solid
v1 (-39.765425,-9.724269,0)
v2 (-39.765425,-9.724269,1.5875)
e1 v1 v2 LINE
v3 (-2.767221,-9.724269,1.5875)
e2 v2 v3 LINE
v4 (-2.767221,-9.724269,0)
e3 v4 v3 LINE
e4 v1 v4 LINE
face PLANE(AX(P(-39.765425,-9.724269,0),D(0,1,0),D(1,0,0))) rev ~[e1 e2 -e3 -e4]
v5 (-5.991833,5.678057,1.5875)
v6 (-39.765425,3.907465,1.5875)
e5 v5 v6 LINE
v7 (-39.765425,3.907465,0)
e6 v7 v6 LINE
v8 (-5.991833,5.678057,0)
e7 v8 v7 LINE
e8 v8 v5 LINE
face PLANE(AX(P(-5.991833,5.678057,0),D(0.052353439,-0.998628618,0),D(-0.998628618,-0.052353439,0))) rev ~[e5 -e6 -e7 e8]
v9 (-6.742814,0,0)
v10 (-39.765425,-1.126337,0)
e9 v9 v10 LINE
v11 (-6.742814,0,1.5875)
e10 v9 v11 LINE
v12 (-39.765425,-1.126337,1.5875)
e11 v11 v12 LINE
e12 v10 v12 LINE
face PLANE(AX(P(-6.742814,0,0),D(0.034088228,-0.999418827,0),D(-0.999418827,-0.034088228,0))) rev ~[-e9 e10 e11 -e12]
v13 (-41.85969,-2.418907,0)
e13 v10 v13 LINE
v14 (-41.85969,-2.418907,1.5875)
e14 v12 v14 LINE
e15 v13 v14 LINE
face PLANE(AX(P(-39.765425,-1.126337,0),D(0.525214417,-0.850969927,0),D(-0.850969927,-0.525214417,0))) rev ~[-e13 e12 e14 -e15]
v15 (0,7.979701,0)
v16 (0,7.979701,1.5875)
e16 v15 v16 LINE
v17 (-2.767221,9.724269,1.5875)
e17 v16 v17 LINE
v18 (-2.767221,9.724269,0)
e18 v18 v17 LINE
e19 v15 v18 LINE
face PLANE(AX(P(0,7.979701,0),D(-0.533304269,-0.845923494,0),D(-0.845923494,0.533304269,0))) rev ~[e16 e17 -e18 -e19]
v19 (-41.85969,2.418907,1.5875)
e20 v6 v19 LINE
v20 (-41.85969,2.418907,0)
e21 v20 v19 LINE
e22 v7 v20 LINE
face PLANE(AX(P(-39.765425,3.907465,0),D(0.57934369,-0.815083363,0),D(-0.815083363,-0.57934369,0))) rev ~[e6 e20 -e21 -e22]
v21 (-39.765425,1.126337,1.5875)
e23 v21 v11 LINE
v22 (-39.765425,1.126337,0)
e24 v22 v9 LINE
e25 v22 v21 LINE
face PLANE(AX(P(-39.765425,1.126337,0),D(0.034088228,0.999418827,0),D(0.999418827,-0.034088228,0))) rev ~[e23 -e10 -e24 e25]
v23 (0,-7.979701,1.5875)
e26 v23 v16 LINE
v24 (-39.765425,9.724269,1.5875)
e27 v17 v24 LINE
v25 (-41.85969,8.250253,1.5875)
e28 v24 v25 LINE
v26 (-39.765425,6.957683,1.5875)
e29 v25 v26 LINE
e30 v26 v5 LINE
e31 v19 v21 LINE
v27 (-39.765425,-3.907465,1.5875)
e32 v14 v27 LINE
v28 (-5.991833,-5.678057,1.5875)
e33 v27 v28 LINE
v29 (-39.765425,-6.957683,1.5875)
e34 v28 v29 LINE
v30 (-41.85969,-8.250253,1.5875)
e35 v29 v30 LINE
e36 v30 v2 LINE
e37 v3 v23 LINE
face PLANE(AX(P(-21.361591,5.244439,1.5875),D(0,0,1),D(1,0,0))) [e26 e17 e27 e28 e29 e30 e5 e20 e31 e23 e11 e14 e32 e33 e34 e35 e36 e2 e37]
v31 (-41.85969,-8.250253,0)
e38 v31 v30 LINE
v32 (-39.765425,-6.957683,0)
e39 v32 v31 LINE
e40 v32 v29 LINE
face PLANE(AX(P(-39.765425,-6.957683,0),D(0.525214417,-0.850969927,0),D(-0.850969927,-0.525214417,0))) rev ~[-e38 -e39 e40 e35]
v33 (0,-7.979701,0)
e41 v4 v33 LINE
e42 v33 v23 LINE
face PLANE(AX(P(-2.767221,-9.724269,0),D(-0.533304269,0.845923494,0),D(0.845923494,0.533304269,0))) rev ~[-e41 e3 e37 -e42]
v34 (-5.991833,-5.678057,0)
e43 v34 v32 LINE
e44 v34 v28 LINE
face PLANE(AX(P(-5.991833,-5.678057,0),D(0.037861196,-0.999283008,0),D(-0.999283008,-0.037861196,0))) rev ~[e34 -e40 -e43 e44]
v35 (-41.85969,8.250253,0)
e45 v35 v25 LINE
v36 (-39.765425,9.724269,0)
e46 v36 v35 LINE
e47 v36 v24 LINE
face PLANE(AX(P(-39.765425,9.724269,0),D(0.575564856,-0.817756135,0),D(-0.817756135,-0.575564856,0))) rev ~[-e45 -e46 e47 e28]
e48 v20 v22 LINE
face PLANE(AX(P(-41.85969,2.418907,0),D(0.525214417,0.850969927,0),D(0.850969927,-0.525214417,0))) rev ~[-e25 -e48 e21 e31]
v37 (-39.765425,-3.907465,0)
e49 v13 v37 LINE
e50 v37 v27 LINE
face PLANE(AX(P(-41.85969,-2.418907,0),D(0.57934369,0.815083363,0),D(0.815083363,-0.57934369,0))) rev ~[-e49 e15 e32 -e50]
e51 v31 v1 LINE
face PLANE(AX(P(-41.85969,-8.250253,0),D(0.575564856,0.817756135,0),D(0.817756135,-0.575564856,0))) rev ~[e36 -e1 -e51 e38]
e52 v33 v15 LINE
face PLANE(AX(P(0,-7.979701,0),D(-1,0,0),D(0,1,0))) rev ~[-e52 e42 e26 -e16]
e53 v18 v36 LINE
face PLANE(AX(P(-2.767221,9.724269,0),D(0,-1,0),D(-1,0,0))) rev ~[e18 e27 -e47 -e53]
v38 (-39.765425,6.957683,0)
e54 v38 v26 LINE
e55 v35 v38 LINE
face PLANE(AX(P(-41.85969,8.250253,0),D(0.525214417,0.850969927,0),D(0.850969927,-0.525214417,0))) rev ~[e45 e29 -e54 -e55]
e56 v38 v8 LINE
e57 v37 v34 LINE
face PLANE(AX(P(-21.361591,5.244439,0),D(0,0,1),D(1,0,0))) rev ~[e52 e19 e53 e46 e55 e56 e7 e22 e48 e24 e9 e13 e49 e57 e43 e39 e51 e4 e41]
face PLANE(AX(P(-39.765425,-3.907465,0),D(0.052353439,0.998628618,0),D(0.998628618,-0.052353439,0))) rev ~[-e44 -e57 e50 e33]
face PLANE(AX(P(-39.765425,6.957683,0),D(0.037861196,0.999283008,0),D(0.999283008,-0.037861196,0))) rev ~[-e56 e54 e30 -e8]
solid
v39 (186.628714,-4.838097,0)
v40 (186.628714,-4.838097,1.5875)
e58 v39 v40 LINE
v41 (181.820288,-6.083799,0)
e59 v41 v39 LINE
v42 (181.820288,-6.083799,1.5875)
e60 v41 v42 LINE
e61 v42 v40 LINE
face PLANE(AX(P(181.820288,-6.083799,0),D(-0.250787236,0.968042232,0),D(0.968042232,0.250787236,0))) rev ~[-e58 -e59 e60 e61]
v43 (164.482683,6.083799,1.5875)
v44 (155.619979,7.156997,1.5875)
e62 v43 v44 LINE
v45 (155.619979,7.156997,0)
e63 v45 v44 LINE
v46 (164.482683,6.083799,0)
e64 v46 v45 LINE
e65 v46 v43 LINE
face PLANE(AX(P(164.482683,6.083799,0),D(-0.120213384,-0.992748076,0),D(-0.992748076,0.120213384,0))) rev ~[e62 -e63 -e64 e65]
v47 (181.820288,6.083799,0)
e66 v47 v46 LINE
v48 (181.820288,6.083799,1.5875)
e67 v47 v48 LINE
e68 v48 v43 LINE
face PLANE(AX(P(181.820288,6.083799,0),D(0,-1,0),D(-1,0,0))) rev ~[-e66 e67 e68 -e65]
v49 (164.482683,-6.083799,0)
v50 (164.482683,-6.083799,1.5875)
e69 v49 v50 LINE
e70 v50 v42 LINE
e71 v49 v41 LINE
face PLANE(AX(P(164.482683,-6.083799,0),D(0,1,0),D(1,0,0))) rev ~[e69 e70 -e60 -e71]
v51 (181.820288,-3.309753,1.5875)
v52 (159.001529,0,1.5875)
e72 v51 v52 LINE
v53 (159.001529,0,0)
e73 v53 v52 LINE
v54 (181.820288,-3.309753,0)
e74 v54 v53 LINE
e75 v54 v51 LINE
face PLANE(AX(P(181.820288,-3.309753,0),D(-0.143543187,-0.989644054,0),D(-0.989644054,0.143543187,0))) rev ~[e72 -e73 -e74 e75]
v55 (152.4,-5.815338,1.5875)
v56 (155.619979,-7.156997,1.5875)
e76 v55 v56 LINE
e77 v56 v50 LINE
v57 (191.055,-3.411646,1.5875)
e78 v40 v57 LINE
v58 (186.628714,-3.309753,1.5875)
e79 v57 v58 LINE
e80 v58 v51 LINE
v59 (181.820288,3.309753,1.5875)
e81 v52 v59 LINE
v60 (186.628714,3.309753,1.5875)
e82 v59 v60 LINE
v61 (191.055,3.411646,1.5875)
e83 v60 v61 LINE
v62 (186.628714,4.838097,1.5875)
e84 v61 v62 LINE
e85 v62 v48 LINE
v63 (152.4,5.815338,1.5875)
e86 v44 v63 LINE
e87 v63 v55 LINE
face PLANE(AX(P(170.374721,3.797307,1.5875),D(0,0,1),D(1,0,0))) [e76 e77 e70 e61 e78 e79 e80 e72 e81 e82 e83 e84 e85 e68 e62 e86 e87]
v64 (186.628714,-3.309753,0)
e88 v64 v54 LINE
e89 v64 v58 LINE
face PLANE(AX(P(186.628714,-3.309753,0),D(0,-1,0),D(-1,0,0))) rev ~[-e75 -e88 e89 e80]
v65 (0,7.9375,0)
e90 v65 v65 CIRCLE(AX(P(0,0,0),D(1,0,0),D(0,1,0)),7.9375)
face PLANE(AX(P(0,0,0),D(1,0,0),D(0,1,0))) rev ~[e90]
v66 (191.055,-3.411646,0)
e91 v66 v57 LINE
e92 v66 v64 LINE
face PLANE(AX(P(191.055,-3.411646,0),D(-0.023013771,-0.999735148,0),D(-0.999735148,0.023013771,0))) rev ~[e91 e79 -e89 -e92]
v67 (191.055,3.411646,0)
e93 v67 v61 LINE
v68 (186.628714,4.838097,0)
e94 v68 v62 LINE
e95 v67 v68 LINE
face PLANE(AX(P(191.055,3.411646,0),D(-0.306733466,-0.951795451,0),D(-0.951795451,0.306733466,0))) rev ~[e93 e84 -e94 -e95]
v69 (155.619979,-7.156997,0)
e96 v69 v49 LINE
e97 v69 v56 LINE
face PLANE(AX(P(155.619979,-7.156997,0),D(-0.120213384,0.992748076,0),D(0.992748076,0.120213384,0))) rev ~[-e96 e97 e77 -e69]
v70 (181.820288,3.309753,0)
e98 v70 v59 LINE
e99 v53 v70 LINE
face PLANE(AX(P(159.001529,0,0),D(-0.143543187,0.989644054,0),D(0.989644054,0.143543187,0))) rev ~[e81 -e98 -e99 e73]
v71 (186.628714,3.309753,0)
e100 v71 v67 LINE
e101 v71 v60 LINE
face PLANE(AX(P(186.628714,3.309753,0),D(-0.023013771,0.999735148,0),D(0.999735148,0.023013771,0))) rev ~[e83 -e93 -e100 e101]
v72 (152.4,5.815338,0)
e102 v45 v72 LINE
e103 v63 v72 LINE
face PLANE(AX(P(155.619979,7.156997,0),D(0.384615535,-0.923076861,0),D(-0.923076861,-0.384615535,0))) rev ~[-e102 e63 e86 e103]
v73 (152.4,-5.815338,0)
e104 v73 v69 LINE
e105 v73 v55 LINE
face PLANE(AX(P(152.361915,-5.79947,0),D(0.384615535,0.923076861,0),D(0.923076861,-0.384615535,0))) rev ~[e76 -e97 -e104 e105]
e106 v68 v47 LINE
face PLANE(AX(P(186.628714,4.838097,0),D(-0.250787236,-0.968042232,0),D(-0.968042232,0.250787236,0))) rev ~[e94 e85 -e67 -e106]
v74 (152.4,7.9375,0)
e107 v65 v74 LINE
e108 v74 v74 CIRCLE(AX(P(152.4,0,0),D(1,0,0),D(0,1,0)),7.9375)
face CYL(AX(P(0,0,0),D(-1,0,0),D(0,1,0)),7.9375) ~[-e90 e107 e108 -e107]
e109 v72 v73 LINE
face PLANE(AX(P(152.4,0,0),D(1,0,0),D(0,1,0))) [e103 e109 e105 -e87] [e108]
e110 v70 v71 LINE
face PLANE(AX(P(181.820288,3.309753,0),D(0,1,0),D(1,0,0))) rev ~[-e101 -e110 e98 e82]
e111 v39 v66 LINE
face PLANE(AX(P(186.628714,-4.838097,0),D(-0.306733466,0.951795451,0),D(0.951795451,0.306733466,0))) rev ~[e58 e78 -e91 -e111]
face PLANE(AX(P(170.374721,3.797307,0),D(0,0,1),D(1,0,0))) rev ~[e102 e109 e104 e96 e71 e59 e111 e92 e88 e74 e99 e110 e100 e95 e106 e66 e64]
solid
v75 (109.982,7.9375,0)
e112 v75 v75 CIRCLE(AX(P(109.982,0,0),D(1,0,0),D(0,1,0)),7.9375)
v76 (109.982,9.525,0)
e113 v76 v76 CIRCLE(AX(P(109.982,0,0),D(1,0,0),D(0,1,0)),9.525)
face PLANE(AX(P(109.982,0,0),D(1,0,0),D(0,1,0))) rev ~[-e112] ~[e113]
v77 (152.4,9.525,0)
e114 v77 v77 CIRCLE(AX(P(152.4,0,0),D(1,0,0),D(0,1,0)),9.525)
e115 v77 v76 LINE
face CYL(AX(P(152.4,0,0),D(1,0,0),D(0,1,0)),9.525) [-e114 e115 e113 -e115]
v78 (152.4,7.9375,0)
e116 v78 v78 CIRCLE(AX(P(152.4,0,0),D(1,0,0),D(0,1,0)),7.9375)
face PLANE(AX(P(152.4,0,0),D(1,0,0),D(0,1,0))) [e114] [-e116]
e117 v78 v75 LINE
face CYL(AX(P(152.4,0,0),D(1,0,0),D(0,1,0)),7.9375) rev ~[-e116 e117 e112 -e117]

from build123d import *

# Parameters (mm, degrees)
F0_R     = 7.9375
F1_DEPTH = 152.4
F3_DEPTH = 1.5875
F5_DEPTH = 1.5875
F6_R     = 9.525
F6_R_2   = 7.9375
F7_DEPTH = 42.418


# Not quite as in the source:
# - a length typed as a fraction of an inch, garbled in the dataset ("3 / 203.2 mm" for 3/8 in), is restored
# - a feature names something its author has since deleted; it is built from what else it names


with BuildPart() as f1:
    # F0 (on Right) → F1 (new body)
    with BuildSketch(Plane.YZ):
        Circle(F0_R)
    extrude(amount=F1_DEPTH)

    # F4 (on Top) → F5 (join)
    with BuildSketch(Plane.XY):
        Polygon((155.6199789047, 7.1569969878), (152.3619145155, 5.799469538), (152.3619145155, 0), (159.0015292168, 0), (181.8202883005, 3.309753025), (186.6287142038, 3.309753025), (191.0549998283, 3.4116455354), (186.6287142038, 4.8380969092), (181.8202883005, 6.0837985948), (164.4826829433, 6.0837985948), align=None)
        Polygon((159.0015292168, 0), (152.3619145155, 0), (152.3619145155, -5.799469538), (155.6199789047, -7.1569969878), (164.4826829433, -6.0837985948), (181.8202883005, -6.0837985948), (186.6287142038, -4.8380969092), (191.0549998283, -3.4116455354), (186.6287142038, -3.309753025), (181.8202883005, -3.309753025), align=None)
    extrude(amount=F5_DEPTH)


with BuildPart() as f3:
    # F2 (on Top) → F3 (new body)
    with BuildSketch(Plane.XY):
        Polygon((0, 0), (0, 7.9797012731), (-2.7672210486, 9.7242689653), (-39.7654250264, 9.7242689653), (-41.8596901, 8.250253275), (-39.7654250264, 6.9576832621), (-5.9918332845, 5.6780572049), (-39.7654250264, 3.907465376), (-41.8596901, 2.4189068936), (-39.7654250264, 1.1263368807), (-6.7428140901, 0), align=None)
        Polygon((0, -7.9797012731), (0, 0), (-6.7428140901, 0), (-39.7654250264, -1.1263368807), (-41.8596901, -2.4189068936), (-39.7654250264, -3.907465376), (-5.9918332845, -5.6780572049), (-39.7654250264, -6.9576832621), (-41.8596901, -8.250253275), (-39.7654250264, -9.7242689653), (-2.7672210486, -9.7242689653), align=None)
    extrude(amount=F3_DEPTH)


with BuildPart() as f7:
    # F6 (on face) → F7 (new body)
    with BuildSketch(Plane.YZ.offset(152.4)):
        Circle(F6_R)
        Circle(F6_R_2, mode=Mode.SUBTRACT)
    extrude(amount=-F7_DEPTH)


solid = Compound([f1.part, f3.part, f7.part])
